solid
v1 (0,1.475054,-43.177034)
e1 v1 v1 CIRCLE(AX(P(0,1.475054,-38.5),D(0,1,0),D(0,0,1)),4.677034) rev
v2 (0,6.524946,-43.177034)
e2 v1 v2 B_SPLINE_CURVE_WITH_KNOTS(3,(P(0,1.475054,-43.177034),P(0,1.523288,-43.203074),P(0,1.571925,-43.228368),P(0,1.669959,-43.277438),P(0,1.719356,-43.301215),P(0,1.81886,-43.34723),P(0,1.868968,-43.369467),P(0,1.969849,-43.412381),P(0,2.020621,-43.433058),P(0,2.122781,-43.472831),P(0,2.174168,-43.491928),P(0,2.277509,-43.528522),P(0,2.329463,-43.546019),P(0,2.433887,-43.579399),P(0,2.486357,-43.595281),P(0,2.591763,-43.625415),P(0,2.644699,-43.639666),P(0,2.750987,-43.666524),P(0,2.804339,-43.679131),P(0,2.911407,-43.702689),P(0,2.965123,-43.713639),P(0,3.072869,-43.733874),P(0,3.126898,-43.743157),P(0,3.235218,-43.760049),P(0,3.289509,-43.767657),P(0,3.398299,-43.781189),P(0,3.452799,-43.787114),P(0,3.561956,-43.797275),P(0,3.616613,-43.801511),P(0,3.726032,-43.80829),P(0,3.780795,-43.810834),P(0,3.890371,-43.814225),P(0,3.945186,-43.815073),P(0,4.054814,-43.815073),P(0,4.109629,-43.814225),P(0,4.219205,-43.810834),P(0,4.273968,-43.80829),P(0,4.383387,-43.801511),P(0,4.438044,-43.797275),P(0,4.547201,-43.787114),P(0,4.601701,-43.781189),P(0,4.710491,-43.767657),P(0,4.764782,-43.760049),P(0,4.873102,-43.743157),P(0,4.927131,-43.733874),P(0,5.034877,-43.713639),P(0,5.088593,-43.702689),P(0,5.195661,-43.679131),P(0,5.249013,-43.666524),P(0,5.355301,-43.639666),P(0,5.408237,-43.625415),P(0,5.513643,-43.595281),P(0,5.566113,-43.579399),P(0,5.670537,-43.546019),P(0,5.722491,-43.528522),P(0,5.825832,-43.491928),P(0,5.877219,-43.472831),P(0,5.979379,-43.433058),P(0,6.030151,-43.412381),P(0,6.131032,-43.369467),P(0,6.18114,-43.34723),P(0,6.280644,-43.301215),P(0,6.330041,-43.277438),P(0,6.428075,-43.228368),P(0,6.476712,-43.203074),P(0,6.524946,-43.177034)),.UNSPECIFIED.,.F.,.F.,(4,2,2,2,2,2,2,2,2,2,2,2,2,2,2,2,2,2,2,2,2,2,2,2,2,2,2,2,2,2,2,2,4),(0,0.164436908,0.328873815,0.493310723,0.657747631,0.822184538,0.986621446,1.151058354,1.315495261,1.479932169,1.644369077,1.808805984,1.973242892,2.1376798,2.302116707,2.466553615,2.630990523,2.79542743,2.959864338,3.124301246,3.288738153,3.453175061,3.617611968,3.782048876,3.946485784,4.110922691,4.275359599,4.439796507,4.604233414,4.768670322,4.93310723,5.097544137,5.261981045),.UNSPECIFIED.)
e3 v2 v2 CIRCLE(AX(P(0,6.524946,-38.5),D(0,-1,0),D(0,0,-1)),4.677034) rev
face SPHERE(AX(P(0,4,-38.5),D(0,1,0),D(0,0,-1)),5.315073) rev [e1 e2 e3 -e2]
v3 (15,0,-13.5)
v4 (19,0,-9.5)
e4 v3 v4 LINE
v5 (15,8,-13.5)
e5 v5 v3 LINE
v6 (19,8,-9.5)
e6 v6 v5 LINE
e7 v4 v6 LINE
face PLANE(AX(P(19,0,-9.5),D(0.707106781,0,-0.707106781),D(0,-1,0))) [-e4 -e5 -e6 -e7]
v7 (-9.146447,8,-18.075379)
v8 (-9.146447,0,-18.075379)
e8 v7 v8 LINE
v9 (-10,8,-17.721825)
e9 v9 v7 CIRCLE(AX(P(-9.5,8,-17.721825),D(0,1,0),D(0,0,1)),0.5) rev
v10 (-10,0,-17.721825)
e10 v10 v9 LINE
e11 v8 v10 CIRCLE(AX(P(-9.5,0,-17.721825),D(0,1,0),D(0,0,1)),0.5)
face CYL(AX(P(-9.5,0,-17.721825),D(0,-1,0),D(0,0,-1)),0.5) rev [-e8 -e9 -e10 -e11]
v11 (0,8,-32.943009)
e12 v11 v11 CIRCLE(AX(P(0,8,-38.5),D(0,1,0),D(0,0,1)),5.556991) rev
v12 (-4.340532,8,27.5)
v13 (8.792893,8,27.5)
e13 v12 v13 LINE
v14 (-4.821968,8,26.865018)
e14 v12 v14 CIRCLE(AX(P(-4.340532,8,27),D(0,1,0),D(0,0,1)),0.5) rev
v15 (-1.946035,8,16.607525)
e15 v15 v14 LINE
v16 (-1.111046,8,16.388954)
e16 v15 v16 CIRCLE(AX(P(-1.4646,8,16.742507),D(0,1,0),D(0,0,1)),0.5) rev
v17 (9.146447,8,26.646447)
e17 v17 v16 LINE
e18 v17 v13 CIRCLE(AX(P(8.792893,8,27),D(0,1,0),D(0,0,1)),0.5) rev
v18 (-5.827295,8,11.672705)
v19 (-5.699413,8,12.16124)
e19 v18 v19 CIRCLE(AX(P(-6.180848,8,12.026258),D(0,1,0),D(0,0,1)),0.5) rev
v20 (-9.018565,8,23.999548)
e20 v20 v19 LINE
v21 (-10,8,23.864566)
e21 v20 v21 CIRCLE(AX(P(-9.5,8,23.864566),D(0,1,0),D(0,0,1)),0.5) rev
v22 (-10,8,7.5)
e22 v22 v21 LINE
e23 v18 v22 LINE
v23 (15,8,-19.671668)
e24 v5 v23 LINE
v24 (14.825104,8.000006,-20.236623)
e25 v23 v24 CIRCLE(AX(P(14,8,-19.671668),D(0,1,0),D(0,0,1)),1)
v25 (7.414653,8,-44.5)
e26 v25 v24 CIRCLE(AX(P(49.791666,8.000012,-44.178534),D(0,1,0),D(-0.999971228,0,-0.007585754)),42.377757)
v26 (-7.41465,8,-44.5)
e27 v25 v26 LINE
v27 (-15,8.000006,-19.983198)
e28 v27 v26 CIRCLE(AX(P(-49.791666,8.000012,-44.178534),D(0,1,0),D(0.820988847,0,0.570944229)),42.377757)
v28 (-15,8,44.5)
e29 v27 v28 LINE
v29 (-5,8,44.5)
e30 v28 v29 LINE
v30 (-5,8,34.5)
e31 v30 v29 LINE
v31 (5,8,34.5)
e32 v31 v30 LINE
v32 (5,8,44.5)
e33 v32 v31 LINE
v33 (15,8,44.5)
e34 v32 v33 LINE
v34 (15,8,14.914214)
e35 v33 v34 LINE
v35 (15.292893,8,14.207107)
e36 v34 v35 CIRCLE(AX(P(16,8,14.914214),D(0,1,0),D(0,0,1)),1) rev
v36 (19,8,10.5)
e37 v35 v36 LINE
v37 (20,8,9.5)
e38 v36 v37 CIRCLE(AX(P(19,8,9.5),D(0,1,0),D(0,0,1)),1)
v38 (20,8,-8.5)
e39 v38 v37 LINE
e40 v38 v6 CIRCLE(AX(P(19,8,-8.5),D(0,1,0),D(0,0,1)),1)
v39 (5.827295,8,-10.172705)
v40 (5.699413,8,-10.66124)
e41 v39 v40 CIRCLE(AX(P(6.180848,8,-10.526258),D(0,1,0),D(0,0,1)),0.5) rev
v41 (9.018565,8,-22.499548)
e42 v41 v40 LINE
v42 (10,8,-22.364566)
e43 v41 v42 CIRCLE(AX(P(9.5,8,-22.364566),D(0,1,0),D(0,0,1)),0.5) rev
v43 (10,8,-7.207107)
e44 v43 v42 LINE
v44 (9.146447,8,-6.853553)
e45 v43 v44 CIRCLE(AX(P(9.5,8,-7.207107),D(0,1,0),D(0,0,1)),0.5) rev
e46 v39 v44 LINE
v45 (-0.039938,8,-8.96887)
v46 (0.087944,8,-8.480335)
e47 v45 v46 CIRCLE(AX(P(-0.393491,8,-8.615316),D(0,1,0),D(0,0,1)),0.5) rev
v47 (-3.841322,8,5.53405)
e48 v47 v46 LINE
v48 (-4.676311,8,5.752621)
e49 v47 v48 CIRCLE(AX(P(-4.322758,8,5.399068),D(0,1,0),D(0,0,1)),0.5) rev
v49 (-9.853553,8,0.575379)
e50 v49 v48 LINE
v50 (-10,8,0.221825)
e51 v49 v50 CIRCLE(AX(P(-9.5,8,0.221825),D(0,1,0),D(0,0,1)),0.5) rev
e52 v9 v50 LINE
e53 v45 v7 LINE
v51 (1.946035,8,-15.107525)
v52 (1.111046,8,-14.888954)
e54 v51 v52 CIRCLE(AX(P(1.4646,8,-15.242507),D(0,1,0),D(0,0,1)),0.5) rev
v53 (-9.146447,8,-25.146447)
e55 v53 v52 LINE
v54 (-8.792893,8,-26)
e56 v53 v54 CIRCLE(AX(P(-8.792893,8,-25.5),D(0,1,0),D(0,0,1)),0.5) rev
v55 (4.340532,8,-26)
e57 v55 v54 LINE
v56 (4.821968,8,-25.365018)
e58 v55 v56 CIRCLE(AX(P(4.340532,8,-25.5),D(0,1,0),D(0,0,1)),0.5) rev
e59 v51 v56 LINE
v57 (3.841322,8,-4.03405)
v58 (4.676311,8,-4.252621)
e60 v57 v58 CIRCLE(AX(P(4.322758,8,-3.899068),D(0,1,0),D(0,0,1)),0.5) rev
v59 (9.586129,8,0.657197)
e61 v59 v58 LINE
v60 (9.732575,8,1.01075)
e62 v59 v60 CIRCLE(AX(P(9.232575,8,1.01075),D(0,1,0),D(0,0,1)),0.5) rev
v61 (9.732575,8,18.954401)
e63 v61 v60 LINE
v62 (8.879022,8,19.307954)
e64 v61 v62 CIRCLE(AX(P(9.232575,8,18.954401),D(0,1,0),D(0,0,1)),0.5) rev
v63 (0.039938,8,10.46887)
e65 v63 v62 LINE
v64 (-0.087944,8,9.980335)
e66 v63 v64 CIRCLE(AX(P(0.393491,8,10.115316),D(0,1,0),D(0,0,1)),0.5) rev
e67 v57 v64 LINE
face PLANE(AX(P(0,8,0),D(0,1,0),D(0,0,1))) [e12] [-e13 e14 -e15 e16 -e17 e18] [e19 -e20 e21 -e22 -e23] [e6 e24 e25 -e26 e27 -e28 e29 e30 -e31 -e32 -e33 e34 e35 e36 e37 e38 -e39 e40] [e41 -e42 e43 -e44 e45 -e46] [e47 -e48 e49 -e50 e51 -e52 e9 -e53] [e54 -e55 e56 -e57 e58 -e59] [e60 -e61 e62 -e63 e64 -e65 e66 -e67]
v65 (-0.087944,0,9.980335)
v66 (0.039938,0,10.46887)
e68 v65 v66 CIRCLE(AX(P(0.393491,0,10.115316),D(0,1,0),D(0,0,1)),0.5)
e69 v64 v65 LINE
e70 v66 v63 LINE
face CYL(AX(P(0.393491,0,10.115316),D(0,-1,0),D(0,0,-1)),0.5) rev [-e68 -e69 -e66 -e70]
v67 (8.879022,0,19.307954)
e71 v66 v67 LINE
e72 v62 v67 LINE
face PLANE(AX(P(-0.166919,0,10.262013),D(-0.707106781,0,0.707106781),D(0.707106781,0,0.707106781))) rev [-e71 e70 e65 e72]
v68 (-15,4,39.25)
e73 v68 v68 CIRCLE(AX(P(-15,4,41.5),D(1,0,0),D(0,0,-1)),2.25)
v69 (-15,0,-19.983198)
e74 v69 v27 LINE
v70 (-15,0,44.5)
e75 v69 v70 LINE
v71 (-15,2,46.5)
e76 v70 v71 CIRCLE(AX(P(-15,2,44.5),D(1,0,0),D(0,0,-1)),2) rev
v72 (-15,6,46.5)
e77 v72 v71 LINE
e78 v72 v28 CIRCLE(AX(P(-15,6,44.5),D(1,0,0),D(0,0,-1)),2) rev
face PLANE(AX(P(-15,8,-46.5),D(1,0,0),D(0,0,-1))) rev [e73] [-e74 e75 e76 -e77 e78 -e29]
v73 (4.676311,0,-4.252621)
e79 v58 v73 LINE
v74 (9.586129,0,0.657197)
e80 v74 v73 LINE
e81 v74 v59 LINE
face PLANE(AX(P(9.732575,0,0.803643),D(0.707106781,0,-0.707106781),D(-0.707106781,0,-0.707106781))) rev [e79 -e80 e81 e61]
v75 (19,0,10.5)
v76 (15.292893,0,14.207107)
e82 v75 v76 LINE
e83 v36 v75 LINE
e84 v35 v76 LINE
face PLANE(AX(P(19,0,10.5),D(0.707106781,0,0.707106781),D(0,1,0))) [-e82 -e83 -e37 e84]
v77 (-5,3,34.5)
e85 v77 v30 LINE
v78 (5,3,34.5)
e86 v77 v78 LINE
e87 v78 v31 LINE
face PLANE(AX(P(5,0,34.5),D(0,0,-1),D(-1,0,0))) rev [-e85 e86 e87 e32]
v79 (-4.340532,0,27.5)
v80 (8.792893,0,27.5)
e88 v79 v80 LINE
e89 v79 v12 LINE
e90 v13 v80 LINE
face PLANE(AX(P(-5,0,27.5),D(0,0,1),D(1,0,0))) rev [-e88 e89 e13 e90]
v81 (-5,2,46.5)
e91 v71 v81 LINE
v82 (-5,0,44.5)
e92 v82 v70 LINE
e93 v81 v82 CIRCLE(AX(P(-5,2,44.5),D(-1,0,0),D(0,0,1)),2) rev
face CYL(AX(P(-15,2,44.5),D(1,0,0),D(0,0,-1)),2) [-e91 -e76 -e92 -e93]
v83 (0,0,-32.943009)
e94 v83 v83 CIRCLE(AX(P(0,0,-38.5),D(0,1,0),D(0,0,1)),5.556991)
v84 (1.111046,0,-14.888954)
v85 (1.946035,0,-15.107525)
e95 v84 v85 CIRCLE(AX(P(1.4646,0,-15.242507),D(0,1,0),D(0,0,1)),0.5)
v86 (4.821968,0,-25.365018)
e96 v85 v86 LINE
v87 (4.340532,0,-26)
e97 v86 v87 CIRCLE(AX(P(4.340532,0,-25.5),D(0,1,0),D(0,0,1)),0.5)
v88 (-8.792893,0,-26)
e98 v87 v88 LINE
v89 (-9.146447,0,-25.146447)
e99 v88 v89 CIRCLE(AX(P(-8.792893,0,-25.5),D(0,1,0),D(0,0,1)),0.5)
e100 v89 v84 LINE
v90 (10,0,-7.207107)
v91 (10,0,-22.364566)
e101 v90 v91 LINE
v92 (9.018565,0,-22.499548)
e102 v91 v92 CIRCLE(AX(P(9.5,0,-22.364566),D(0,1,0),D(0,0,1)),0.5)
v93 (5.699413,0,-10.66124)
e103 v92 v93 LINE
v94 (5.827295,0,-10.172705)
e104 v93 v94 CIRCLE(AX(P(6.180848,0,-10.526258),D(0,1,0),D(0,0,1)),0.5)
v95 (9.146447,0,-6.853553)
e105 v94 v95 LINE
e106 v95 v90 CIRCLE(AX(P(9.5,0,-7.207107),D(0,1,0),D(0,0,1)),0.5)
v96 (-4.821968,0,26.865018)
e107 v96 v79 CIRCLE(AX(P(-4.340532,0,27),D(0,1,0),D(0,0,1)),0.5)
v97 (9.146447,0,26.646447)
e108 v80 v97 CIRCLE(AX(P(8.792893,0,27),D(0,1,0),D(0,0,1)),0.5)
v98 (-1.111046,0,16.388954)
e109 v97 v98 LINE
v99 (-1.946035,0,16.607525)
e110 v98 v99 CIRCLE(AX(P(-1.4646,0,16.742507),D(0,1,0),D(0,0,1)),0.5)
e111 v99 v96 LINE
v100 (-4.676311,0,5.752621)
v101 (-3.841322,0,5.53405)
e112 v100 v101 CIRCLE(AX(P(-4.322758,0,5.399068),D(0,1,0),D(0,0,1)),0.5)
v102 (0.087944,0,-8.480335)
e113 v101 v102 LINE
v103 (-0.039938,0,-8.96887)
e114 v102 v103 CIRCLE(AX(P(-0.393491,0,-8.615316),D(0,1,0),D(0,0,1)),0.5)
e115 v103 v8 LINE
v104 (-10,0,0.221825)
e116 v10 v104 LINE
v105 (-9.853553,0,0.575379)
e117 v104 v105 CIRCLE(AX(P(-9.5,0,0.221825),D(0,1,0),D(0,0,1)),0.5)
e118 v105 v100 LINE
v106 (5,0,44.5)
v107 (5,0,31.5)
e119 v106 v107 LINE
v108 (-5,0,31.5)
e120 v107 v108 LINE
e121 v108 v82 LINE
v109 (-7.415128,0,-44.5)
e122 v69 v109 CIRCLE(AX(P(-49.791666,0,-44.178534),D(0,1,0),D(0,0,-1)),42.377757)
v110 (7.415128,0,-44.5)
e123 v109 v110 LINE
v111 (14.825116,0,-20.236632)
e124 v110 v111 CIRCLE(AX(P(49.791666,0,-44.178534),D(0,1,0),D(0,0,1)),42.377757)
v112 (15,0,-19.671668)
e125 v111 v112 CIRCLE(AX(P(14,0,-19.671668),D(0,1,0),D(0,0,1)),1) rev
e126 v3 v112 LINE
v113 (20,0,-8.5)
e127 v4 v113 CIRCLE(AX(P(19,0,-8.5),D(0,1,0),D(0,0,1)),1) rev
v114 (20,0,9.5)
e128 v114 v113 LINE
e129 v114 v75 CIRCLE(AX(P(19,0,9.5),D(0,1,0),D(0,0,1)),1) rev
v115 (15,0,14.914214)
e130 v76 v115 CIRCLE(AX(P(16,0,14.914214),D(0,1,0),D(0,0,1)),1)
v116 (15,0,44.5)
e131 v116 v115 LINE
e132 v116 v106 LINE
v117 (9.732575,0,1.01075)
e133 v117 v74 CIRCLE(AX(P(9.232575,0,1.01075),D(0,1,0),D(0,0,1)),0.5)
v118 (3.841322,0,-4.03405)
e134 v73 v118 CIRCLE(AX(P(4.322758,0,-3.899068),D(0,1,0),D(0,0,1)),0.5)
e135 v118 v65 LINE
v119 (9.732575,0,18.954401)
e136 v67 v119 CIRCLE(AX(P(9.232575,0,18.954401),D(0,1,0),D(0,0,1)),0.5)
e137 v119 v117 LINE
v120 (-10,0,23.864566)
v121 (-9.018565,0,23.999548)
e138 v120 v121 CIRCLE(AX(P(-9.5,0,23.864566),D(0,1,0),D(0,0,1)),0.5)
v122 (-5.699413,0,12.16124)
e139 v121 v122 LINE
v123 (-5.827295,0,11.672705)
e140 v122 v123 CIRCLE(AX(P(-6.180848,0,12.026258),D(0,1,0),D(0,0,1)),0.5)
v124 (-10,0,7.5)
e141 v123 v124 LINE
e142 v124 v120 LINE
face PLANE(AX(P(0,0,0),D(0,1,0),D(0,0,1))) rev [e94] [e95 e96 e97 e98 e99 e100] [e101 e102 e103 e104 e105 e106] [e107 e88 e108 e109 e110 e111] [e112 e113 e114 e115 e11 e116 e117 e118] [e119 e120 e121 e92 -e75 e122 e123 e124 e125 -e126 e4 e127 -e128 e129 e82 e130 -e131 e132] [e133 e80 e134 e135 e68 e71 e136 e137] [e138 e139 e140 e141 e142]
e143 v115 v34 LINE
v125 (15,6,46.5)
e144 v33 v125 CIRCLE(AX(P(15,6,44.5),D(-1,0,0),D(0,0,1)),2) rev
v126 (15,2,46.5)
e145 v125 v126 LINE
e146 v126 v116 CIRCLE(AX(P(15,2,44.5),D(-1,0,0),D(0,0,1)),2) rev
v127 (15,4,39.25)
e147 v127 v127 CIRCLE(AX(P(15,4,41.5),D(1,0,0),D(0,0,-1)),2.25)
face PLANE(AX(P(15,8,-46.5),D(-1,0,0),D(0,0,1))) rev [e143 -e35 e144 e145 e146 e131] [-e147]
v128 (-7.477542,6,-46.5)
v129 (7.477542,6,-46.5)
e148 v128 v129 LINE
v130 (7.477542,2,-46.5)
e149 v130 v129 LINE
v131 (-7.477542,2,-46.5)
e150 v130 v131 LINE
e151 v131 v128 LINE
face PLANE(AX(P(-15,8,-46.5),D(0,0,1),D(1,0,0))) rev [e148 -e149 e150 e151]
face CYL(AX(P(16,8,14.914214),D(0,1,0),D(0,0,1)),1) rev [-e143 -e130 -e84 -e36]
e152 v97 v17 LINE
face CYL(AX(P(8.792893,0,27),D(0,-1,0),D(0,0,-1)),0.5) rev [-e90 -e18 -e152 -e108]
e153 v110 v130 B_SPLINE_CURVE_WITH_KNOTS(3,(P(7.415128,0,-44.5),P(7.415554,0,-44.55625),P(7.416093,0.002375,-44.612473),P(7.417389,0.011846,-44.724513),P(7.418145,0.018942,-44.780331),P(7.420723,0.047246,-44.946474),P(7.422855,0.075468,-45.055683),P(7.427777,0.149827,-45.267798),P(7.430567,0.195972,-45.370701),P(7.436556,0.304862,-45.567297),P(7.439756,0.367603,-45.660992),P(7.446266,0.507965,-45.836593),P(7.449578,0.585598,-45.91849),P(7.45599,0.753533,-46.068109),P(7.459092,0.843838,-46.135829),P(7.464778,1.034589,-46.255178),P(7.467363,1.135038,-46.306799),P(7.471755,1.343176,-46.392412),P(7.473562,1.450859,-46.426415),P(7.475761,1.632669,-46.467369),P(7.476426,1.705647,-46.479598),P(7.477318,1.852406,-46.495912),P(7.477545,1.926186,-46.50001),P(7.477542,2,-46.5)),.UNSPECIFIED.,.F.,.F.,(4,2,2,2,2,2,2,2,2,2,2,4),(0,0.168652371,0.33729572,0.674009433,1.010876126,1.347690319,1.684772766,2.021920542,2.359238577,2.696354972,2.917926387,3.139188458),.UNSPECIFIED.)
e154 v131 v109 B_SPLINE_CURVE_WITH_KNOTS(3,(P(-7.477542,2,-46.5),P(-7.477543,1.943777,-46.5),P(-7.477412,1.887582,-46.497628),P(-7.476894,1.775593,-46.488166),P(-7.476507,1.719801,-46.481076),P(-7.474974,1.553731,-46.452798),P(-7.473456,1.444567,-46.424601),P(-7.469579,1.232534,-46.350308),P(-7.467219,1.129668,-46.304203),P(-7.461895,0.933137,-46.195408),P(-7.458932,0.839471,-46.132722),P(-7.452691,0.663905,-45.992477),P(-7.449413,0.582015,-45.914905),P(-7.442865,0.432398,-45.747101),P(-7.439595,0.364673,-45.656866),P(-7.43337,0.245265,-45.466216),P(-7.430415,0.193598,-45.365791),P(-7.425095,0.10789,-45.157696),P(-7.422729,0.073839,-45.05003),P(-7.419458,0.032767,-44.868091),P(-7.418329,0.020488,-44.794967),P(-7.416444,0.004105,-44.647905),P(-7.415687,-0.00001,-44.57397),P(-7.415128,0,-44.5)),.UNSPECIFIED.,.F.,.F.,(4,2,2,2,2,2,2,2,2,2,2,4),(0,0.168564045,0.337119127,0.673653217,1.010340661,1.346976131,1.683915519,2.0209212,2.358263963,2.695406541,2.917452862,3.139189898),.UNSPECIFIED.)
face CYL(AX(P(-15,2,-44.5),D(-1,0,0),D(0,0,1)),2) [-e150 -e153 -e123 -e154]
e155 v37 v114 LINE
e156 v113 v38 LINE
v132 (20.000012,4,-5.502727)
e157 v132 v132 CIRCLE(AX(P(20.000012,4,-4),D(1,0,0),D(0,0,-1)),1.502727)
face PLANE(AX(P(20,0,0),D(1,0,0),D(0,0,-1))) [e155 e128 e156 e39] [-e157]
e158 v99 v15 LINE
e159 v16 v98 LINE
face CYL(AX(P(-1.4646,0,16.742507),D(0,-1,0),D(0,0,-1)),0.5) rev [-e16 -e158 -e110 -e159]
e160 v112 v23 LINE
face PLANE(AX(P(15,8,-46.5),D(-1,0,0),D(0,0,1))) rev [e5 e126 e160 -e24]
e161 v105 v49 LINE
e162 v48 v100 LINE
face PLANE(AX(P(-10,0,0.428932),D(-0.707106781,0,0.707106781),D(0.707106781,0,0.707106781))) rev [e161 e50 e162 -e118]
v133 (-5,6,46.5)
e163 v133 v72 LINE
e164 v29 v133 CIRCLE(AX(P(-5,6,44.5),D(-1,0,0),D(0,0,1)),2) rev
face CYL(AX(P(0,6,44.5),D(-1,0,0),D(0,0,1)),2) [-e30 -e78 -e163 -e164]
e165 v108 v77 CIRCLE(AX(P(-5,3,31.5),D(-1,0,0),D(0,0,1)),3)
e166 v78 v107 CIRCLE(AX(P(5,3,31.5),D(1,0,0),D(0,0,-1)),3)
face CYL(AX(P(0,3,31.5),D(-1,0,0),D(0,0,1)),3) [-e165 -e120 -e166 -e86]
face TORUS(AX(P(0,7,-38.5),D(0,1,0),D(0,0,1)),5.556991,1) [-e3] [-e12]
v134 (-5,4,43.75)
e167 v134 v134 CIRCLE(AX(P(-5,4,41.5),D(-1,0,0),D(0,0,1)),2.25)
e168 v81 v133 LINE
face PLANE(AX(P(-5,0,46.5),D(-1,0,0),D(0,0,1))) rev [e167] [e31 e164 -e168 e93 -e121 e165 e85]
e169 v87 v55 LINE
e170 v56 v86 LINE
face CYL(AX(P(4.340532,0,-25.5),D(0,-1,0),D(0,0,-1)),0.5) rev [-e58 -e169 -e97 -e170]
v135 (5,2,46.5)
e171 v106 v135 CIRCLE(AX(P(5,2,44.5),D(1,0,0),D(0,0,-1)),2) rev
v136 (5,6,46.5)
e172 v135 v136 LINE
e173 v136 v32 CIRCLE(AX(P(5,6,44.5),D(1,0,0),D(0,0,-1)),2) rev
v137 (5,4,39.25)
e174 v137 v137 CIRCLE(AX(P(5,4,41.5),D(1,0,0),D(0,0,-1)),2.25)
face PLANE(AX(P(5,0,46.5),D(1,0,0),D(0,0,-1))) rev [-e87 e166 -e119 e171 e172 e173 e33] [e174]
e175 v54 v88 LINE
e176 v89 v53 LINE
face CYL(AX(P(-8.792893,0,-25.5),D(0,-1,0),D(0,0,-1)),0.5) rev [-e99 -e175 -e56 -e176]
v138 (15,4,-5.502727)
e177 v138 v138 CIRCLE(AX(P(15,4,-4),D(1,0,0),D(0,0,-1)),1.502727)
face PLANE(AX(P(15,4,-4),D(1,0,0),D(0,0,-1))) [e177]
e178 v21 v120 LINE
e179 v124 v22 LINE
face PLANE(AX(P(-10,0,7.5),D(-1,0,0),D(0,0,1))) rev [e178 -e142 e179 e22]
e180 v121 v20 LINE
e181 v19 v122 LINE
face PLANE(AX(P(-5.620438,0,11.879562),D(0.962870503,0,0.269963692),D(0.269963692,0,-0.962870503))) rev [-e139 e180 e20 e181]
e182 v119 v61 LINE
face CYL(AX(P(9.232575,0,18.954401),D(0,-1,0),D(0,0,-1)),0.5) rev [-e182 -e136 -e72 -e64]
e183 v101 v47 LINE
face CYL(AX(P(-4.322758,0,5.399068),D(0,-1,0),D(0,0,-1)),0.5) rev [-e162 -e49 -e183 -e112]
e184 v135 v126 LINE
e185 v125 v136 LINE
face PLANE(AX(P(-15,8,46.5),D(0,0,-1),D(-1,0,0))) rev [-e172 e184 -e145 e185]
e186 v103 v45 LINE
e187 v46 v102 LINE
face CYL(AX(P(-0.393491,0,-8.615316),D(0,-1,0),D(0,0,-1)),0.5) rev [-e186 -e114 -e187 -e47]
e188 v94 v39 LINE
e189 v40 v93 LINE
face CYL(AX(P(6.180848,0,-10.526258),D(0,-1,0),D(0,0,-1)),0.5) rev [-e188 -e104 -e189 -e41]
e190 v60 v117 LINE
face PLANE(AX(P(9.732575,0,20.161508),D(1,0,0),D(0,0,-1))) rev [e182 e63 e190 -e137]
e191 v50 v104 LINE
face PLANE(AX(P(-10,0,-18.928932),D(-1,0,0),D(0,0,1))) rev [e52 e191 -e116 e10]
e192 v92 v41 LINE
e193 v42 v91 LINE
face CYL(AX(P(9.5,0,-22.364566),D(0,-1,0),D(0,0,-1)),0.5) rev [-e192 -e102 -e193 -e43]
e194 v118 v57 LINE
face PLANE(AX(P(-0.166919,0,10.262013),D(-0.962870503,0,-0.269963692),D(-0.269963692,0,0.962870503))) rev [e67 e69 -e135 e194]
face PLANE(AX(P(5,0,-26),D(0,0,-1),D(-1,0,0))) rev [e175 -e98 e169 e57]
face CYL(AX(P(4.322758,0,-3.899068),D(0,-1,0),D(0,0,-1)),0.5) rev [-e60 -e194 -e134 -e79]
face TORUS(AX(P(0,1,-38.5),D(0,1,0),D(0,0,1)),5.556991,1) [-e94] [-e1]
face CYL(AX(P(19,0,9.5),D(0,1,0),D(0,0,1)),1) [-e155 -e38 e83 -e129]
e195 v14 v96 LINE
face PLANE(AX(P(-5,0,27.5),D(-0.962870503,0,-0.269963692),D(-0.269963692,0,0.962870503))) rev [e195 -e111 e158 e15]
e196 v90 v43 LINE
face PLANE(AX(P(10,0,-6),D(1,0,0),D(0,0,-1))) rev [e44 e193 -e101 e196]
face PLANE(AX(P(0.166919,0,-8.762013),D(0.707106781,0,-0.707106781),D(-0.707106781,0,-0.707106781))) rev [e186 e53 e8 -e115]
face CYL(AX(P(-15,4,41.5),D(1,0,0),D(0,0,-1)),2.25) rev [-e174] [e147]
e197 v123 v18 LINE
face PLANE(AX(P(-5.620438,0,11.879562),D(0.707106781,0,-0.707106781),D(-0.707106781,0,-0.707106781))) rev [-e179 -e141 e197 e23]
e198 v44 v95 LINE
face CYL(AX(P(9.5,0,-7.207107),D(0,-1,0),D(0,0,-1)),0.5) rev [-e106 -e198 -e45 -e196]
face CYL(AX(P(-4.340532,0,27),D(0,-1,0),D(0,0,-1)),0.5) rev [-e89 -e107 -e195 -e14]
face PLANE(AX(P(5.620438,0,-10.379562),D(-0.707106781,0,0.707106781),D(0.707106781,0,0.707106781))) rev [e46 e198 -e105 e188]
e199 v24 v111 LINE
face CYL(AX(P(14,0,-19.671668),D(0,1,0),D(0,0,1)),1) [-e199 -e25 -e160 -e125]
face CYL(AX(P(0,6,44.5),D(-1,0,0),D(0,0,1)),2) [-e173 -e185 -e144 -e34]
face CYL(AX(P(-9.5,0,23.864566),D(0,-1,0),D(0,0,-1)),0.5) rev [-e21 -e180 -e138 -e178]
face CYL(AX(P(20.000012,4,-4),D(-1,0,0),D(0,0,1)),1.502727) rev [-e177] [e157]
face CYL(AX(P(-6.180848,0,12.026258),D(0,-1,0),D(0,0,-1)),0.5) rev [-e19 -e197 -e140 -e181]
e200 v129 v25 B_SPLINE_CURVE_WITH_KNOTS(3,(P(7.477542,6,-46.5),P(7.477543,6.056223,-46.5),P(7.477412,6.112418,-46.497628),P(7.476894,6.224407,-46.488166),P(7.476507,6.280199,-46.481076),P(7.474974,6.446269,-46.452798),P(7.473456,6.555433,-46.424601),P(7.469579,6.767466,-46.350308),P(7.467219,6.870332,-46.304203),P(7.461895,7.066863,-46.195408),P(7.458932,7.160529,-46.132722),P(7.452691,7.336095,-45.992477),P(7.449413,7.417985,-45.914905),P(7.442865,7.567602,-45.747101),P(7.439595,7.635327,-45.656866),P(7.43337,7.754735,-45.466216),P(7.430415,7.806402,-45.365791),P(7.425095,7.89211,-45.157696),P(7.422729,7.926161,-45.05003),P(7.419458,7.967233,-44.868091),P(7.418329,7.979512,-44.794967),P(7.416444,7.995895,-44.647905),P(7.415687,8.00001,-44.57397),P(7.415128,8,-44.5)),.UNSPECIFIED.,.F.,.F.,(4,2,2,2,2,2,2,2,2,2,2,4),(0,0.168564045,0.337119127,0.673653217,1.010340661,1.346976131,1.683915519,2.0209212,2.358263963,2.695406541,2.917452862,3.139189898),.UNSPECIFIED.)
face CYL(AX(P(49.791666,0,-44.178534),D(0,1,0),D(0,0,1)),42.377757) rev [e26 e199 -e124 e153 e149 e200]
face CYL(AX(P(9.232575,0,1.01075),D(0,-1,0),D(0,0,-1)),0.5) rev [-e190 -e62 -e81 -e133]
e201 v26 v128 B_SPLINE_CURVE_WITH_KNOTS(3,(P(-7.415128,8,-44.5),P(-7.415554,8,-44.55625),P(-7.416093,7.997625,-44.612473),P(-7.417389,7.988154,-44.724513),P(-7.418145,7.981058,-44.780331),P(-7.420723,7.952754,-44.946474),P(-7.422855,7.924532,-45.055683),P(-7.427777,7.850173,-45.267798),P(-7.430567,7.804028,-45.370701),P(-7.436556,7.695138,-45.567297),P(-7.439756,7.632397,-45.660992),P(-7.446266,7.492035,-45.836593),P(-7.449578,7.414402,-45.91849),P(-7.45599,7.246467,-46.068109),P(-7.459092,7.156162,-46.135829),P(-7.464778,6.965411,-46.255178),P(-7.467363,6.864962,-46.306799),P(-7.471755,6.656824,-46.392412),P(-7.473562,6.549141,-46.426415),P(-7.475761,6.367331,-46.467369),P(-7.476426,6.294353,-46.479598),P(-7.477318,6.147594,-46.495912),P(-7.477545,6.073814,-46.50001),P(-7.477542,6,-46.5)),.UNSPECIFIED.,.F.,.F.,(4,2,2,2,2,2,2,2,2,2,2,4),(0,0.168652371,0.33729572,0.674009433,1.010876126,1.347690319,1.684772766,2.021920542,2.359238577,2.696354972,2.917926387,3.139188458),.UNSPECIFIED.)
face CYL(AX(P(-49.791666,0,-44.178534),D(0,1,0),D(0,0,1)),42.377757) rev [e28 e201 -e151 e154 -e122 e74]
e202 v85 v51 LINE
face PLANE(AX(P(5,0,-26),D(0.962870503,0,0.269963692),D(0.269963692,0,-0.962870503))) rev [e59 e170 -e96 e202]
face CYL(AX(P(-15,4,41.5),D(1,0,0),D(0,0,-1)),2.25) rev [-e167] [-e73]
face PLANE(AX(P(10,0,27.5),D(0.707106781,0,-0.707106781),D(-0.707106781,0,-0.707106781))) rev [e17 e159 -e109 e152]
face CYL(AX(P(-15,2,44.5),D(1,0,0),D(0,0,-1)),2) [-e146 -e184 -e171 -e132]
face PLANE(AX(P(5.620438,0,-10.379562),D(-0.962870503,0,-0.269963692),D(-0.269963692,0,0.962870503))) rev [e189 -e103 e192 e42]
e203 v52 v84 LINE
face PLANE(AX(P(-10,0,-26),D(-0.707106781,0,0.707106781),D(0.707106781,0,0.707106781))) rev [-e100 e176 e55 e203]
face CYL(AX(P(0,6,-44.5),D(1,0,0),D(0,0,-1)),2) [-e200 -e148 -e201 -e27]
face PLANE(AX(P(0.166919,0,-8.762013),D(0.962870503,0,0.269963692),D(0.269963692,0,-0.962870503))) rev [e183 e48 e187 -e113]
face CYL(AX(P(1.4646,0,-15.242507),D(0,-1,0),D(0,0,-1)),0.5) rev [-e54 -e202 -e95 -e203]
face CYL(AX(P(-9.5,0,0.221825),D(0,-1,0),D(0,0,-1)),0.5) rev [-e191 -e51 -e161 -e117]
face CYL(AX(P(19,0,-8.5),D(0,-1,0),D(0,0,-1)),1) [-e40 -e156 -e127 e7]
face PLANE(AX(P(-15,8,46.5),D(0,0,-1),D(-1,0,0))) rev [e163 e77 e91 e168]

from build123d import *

# Parameters (mm, degrees)
SKETCH1_W               = 30
SKETCH1_H               = 93
BOSS_EXTRUDE1_DEPTH     = 8
SKETCH2_W               = 10
SKETCH2_H               = 12
CUT_EXTRUDE1_DEPTH      = 8
SKETCH3_R               = 2.25
CUT_EXTRUDE2_DEPTH      = 56.91287866
FILLET1_R               = 2
CUT_EXTRUDE3_DEPTH      = 50.51009998
FILLET2_R               = 3
CUT_EXTRUDE4_DEPTH      = 50.51009998
CUT_EXTRUDE4_DEPTH_BACK = 50.51009998
FILLET3_R               = 1
FILLET4_R               = 0.5
SKETCH8_W               = 20
SKETCH8_H               = 8
BOSS_EXTRUDE2_DEPTH     = 5
CUT_EXTRUDE5_DEPTH      = 59.747340518
CUT_EXTRUDE5_DEPTH_BACK = 5
SKETCH9_R               = 1.502727392
CHAMFER1_SIZE           = 4
FILLET5_R               = 1


with BuildPart() as part:
    # Sketch1 → Boss-Extrude1 (new body)
    with BuildSketch(Plane(origin=(0, 0, 0), x_dir=(1, 0, 0), z_dir=(0, 1, 0))):
        Rectangle(SKETCH1_W, SKETCH1_H)
    extrude(amount=BOSS_EXTRUDE1_DEPTH)

    # Sketch2 → Cut-Extrude1 (cut)
    with BuildSketch(Plane(origin=(0, 8, 0), x_dir=(1, 0, 0), z_dir=(0, 1, 0))):
        with Locations((0, -40.5)):
            Rectangle(SKETCH2_W, SKETCH2_H)
    extrude(amount=-CUT_EXTRUDE1_DEPTH, mode=Mode.SUBTRACT)

    # Sketch3 → Cut-Extrude2 (cut, through all)
    with BuildSketch(Plane(origin=(15, 0, 0), x_dir=(0, 0, -1), z_dir=(1, 0, 0))):
        with Locations((-41.5, 4)):
            Circle(SKETCH3_R)
    extrude(amount=-CUT_EXTRUDE2_DEPTH, mode=Mode.SUBTRACT)

    # Fillet1
    fillet1_edges = [part.edges().sort_by_distance(p)[0] for p in [
        (10, 0, 46.5),
        (-10, 8, 46.5),
        (10, 8, 46.5),
        (-10, 0, 46.5),
        (0, 0, -46.5),
        (0, 8, -46.5),
    ]]
    fillet(fillet1_edges, radius=FILLET1_R)

    # Sketch4 → Cut-Extrude3 (cut, through all)
    with BuildSketch(Plane(origin=(0, 8, 0), x_dir=(1, 0, 0), z_dir=(0, 1, 0))):
        Polygon((5, 26), (-10, 26), (1.715328467, 14.284671533), align=None)
        Polygon((10, 6), (10, 26), (5.620437956, 10.379562044), align=None)
        Polygon((-10, -7.5), (-10, -27.5), (-5.620437956, -11.879562044), align=None)
        Polygon((-5, -27.5), (10, -27.5), (-1.715328467, -15.784671533), align=None)
        Polygon((-10, 18.928932188), (-10, -0.428932188), (-4.072028946, -6.356903242), (0.166919457, 8.762012731), align=None)
        Polygon((9.732575479, -20.161507667), (9.732575479, -0.803643291), (4.072028946, 4.856903242), (-0.166919457, -10.262012731), align=None)
    extrude(amount=-CUT_EXTRUDE3_DEPTH, mode=Mode.SUBTRACT)

    # Fillet2
    fillet2_edges = [part.edges().sort_by_distance(p)[0] for p in [
        (0, 0, 34.5),
    ]]
    fillet(fillet2_edges, radius=FILLET2_R)

    # Sketch6 → Cut-Extrude4 (cut, two sides: drawn at the far end of the back side and taken through both)
    with BuildSketch(Plane(origin=(0, 8, 0), x_dir=(1, 0, 0), z_dir=(0, 1, 0)).offset(-CUT_EXTRUDE4_DEPTH_BACK)):
        with BuildLine():
            Line((-7.477541934, 46.5), (-15, 46.5))
            Line((-15, 46.5), (-15, 19.983197599))
            ThreePointArc((-15, 19.983197599), (-9.022671438, 32.612921347), (-7.477541934, 46.5))
        make_face()
        with BuildLine():
            Line((15, 46.5), (15, 19.983197599))
            ThreePointArc((15, 19.983197599), (9.022671438, 32.612921347), (7.477541934, 46.5))
            Line((7.477541934, 46.5), (15, 46.5))
        make_face()
    extrude(amount=CUT_EXTRUDE4_DEPTH + CUT_EXTRUDE4_DEPTH_BACK, mode=Mode.SUBTRACT)

    # Sketch5 → Cut-Revolve1 (revolve, cut)
    with BuildSketch(Plane(origin=(0, 0, 0), x_dir=(0, 0, -1), z_dir=(1, 0, 0))):
        with BuildLine():
            Line((38.5, 8), (38.5, 0))
            Line((38.5, 0), (42, 0))
            ThreePointArc((42, 0), (43.815072906, 4), (42, 8))
            Line((42, 8), (38.5, 8))
        make_face()
    revolve(axis=Axis((0, 8, -38.5), (0, -1, 0)), mode=Mode.SUBTRACT)

    # Fillet3
    fillet3_edges = [part.edges().sort_by_distance(p)[0] for p in [
        (0, 8, -35),
        (0, 0, -35),
    ]]
    fillet(fillet3_edges, radius=FILLET3_R)

    # Fillet4
    fillet4_edges = [part.edges().sort_by_distance(p)[0] for p in [
        (-10, 4, -18.928932188),
        (0.166919457, 4, -8.762012731),
        (-4.072028946, 4, 6.356903242),
        (-10, 4, 0.428932188),
        (-1.715328467, 4, 15.784671533),
        (10, 4, 27.5),
        (-5, 4, 27.5),
        (10, 4, -6),
        (5.620437956, 4, -10.379562044),
        (10, 4, -26),
        (-5.620437956, 4, 11.879562044),
        (-10, 4, 27.5),
        (9.732575479, 4, 20.161507667),
        (-0.166919457, 4, 10.262012731),
        (4.072028946, 4, -4.856903242),
        (9.732575479, 4, 0.803643291),
        (5, 4, -26),
        (1.715328467, 4, -14.284671533),
        (-10, 4, -26),
    ]]
    fillet(fillet4_edges, radius=FILLET4_R)

    # Sketch8 → Boss-Extrude2 (add)
    with BuildSketch(Plane(origin=(15, 0, 0), x_dir=(0, 0, -1), z_dir=(1, 0, 0))):
        with Locations((-0.5, 4)):
            Rectangle(SKETCH8_W, SKETCH8_H)
    extrude(amount=BOSS_EXTRUDE2_DEPTH)

    # Sketch9 → Cut-Extrude5 (cut, two sides: drawn at the far end of the back side and taken through both)
    with BuildSketch(Plane(origin=(20, 0, 0), x_dir=(0, 0, -1), z_dir=(1, 0, 0)).offset(-CUT_EXTRUDE5_DEPTH_BACK)):
        with Locations((4, 4)):
            Circle(SKETCH9_R)
    extrude(amount=CUT_EXTRUDE5_DEPTH + CUT_EXTRUDE5_DEPTH_BACK, mode=Mode.SUBTRACT)

    # Chamfer1
    chamfer1_edges = [part.edges().sort_by_distance(p)[0] for p in [
        (15, 4, 10.5),
        (15, 4, -9.5),
    ]]
    chamfer(chamfer1_edges, length=CHAMFER1_SIZE)

    # Fillet5
    fillet5_edges = [part.edges().sort_by_distance(p)[0] for p in [
        (20, 4, 10.5),
        (15, 4, 14.5),
        (15, 4, -19.983197599),
        (20, 4, -9.5),
    ]]
    fillet(fillet5_edges, radius=FILLET5_R - 0.0001)  # a hair under: the kernel refuses the full size


solid = part.part
